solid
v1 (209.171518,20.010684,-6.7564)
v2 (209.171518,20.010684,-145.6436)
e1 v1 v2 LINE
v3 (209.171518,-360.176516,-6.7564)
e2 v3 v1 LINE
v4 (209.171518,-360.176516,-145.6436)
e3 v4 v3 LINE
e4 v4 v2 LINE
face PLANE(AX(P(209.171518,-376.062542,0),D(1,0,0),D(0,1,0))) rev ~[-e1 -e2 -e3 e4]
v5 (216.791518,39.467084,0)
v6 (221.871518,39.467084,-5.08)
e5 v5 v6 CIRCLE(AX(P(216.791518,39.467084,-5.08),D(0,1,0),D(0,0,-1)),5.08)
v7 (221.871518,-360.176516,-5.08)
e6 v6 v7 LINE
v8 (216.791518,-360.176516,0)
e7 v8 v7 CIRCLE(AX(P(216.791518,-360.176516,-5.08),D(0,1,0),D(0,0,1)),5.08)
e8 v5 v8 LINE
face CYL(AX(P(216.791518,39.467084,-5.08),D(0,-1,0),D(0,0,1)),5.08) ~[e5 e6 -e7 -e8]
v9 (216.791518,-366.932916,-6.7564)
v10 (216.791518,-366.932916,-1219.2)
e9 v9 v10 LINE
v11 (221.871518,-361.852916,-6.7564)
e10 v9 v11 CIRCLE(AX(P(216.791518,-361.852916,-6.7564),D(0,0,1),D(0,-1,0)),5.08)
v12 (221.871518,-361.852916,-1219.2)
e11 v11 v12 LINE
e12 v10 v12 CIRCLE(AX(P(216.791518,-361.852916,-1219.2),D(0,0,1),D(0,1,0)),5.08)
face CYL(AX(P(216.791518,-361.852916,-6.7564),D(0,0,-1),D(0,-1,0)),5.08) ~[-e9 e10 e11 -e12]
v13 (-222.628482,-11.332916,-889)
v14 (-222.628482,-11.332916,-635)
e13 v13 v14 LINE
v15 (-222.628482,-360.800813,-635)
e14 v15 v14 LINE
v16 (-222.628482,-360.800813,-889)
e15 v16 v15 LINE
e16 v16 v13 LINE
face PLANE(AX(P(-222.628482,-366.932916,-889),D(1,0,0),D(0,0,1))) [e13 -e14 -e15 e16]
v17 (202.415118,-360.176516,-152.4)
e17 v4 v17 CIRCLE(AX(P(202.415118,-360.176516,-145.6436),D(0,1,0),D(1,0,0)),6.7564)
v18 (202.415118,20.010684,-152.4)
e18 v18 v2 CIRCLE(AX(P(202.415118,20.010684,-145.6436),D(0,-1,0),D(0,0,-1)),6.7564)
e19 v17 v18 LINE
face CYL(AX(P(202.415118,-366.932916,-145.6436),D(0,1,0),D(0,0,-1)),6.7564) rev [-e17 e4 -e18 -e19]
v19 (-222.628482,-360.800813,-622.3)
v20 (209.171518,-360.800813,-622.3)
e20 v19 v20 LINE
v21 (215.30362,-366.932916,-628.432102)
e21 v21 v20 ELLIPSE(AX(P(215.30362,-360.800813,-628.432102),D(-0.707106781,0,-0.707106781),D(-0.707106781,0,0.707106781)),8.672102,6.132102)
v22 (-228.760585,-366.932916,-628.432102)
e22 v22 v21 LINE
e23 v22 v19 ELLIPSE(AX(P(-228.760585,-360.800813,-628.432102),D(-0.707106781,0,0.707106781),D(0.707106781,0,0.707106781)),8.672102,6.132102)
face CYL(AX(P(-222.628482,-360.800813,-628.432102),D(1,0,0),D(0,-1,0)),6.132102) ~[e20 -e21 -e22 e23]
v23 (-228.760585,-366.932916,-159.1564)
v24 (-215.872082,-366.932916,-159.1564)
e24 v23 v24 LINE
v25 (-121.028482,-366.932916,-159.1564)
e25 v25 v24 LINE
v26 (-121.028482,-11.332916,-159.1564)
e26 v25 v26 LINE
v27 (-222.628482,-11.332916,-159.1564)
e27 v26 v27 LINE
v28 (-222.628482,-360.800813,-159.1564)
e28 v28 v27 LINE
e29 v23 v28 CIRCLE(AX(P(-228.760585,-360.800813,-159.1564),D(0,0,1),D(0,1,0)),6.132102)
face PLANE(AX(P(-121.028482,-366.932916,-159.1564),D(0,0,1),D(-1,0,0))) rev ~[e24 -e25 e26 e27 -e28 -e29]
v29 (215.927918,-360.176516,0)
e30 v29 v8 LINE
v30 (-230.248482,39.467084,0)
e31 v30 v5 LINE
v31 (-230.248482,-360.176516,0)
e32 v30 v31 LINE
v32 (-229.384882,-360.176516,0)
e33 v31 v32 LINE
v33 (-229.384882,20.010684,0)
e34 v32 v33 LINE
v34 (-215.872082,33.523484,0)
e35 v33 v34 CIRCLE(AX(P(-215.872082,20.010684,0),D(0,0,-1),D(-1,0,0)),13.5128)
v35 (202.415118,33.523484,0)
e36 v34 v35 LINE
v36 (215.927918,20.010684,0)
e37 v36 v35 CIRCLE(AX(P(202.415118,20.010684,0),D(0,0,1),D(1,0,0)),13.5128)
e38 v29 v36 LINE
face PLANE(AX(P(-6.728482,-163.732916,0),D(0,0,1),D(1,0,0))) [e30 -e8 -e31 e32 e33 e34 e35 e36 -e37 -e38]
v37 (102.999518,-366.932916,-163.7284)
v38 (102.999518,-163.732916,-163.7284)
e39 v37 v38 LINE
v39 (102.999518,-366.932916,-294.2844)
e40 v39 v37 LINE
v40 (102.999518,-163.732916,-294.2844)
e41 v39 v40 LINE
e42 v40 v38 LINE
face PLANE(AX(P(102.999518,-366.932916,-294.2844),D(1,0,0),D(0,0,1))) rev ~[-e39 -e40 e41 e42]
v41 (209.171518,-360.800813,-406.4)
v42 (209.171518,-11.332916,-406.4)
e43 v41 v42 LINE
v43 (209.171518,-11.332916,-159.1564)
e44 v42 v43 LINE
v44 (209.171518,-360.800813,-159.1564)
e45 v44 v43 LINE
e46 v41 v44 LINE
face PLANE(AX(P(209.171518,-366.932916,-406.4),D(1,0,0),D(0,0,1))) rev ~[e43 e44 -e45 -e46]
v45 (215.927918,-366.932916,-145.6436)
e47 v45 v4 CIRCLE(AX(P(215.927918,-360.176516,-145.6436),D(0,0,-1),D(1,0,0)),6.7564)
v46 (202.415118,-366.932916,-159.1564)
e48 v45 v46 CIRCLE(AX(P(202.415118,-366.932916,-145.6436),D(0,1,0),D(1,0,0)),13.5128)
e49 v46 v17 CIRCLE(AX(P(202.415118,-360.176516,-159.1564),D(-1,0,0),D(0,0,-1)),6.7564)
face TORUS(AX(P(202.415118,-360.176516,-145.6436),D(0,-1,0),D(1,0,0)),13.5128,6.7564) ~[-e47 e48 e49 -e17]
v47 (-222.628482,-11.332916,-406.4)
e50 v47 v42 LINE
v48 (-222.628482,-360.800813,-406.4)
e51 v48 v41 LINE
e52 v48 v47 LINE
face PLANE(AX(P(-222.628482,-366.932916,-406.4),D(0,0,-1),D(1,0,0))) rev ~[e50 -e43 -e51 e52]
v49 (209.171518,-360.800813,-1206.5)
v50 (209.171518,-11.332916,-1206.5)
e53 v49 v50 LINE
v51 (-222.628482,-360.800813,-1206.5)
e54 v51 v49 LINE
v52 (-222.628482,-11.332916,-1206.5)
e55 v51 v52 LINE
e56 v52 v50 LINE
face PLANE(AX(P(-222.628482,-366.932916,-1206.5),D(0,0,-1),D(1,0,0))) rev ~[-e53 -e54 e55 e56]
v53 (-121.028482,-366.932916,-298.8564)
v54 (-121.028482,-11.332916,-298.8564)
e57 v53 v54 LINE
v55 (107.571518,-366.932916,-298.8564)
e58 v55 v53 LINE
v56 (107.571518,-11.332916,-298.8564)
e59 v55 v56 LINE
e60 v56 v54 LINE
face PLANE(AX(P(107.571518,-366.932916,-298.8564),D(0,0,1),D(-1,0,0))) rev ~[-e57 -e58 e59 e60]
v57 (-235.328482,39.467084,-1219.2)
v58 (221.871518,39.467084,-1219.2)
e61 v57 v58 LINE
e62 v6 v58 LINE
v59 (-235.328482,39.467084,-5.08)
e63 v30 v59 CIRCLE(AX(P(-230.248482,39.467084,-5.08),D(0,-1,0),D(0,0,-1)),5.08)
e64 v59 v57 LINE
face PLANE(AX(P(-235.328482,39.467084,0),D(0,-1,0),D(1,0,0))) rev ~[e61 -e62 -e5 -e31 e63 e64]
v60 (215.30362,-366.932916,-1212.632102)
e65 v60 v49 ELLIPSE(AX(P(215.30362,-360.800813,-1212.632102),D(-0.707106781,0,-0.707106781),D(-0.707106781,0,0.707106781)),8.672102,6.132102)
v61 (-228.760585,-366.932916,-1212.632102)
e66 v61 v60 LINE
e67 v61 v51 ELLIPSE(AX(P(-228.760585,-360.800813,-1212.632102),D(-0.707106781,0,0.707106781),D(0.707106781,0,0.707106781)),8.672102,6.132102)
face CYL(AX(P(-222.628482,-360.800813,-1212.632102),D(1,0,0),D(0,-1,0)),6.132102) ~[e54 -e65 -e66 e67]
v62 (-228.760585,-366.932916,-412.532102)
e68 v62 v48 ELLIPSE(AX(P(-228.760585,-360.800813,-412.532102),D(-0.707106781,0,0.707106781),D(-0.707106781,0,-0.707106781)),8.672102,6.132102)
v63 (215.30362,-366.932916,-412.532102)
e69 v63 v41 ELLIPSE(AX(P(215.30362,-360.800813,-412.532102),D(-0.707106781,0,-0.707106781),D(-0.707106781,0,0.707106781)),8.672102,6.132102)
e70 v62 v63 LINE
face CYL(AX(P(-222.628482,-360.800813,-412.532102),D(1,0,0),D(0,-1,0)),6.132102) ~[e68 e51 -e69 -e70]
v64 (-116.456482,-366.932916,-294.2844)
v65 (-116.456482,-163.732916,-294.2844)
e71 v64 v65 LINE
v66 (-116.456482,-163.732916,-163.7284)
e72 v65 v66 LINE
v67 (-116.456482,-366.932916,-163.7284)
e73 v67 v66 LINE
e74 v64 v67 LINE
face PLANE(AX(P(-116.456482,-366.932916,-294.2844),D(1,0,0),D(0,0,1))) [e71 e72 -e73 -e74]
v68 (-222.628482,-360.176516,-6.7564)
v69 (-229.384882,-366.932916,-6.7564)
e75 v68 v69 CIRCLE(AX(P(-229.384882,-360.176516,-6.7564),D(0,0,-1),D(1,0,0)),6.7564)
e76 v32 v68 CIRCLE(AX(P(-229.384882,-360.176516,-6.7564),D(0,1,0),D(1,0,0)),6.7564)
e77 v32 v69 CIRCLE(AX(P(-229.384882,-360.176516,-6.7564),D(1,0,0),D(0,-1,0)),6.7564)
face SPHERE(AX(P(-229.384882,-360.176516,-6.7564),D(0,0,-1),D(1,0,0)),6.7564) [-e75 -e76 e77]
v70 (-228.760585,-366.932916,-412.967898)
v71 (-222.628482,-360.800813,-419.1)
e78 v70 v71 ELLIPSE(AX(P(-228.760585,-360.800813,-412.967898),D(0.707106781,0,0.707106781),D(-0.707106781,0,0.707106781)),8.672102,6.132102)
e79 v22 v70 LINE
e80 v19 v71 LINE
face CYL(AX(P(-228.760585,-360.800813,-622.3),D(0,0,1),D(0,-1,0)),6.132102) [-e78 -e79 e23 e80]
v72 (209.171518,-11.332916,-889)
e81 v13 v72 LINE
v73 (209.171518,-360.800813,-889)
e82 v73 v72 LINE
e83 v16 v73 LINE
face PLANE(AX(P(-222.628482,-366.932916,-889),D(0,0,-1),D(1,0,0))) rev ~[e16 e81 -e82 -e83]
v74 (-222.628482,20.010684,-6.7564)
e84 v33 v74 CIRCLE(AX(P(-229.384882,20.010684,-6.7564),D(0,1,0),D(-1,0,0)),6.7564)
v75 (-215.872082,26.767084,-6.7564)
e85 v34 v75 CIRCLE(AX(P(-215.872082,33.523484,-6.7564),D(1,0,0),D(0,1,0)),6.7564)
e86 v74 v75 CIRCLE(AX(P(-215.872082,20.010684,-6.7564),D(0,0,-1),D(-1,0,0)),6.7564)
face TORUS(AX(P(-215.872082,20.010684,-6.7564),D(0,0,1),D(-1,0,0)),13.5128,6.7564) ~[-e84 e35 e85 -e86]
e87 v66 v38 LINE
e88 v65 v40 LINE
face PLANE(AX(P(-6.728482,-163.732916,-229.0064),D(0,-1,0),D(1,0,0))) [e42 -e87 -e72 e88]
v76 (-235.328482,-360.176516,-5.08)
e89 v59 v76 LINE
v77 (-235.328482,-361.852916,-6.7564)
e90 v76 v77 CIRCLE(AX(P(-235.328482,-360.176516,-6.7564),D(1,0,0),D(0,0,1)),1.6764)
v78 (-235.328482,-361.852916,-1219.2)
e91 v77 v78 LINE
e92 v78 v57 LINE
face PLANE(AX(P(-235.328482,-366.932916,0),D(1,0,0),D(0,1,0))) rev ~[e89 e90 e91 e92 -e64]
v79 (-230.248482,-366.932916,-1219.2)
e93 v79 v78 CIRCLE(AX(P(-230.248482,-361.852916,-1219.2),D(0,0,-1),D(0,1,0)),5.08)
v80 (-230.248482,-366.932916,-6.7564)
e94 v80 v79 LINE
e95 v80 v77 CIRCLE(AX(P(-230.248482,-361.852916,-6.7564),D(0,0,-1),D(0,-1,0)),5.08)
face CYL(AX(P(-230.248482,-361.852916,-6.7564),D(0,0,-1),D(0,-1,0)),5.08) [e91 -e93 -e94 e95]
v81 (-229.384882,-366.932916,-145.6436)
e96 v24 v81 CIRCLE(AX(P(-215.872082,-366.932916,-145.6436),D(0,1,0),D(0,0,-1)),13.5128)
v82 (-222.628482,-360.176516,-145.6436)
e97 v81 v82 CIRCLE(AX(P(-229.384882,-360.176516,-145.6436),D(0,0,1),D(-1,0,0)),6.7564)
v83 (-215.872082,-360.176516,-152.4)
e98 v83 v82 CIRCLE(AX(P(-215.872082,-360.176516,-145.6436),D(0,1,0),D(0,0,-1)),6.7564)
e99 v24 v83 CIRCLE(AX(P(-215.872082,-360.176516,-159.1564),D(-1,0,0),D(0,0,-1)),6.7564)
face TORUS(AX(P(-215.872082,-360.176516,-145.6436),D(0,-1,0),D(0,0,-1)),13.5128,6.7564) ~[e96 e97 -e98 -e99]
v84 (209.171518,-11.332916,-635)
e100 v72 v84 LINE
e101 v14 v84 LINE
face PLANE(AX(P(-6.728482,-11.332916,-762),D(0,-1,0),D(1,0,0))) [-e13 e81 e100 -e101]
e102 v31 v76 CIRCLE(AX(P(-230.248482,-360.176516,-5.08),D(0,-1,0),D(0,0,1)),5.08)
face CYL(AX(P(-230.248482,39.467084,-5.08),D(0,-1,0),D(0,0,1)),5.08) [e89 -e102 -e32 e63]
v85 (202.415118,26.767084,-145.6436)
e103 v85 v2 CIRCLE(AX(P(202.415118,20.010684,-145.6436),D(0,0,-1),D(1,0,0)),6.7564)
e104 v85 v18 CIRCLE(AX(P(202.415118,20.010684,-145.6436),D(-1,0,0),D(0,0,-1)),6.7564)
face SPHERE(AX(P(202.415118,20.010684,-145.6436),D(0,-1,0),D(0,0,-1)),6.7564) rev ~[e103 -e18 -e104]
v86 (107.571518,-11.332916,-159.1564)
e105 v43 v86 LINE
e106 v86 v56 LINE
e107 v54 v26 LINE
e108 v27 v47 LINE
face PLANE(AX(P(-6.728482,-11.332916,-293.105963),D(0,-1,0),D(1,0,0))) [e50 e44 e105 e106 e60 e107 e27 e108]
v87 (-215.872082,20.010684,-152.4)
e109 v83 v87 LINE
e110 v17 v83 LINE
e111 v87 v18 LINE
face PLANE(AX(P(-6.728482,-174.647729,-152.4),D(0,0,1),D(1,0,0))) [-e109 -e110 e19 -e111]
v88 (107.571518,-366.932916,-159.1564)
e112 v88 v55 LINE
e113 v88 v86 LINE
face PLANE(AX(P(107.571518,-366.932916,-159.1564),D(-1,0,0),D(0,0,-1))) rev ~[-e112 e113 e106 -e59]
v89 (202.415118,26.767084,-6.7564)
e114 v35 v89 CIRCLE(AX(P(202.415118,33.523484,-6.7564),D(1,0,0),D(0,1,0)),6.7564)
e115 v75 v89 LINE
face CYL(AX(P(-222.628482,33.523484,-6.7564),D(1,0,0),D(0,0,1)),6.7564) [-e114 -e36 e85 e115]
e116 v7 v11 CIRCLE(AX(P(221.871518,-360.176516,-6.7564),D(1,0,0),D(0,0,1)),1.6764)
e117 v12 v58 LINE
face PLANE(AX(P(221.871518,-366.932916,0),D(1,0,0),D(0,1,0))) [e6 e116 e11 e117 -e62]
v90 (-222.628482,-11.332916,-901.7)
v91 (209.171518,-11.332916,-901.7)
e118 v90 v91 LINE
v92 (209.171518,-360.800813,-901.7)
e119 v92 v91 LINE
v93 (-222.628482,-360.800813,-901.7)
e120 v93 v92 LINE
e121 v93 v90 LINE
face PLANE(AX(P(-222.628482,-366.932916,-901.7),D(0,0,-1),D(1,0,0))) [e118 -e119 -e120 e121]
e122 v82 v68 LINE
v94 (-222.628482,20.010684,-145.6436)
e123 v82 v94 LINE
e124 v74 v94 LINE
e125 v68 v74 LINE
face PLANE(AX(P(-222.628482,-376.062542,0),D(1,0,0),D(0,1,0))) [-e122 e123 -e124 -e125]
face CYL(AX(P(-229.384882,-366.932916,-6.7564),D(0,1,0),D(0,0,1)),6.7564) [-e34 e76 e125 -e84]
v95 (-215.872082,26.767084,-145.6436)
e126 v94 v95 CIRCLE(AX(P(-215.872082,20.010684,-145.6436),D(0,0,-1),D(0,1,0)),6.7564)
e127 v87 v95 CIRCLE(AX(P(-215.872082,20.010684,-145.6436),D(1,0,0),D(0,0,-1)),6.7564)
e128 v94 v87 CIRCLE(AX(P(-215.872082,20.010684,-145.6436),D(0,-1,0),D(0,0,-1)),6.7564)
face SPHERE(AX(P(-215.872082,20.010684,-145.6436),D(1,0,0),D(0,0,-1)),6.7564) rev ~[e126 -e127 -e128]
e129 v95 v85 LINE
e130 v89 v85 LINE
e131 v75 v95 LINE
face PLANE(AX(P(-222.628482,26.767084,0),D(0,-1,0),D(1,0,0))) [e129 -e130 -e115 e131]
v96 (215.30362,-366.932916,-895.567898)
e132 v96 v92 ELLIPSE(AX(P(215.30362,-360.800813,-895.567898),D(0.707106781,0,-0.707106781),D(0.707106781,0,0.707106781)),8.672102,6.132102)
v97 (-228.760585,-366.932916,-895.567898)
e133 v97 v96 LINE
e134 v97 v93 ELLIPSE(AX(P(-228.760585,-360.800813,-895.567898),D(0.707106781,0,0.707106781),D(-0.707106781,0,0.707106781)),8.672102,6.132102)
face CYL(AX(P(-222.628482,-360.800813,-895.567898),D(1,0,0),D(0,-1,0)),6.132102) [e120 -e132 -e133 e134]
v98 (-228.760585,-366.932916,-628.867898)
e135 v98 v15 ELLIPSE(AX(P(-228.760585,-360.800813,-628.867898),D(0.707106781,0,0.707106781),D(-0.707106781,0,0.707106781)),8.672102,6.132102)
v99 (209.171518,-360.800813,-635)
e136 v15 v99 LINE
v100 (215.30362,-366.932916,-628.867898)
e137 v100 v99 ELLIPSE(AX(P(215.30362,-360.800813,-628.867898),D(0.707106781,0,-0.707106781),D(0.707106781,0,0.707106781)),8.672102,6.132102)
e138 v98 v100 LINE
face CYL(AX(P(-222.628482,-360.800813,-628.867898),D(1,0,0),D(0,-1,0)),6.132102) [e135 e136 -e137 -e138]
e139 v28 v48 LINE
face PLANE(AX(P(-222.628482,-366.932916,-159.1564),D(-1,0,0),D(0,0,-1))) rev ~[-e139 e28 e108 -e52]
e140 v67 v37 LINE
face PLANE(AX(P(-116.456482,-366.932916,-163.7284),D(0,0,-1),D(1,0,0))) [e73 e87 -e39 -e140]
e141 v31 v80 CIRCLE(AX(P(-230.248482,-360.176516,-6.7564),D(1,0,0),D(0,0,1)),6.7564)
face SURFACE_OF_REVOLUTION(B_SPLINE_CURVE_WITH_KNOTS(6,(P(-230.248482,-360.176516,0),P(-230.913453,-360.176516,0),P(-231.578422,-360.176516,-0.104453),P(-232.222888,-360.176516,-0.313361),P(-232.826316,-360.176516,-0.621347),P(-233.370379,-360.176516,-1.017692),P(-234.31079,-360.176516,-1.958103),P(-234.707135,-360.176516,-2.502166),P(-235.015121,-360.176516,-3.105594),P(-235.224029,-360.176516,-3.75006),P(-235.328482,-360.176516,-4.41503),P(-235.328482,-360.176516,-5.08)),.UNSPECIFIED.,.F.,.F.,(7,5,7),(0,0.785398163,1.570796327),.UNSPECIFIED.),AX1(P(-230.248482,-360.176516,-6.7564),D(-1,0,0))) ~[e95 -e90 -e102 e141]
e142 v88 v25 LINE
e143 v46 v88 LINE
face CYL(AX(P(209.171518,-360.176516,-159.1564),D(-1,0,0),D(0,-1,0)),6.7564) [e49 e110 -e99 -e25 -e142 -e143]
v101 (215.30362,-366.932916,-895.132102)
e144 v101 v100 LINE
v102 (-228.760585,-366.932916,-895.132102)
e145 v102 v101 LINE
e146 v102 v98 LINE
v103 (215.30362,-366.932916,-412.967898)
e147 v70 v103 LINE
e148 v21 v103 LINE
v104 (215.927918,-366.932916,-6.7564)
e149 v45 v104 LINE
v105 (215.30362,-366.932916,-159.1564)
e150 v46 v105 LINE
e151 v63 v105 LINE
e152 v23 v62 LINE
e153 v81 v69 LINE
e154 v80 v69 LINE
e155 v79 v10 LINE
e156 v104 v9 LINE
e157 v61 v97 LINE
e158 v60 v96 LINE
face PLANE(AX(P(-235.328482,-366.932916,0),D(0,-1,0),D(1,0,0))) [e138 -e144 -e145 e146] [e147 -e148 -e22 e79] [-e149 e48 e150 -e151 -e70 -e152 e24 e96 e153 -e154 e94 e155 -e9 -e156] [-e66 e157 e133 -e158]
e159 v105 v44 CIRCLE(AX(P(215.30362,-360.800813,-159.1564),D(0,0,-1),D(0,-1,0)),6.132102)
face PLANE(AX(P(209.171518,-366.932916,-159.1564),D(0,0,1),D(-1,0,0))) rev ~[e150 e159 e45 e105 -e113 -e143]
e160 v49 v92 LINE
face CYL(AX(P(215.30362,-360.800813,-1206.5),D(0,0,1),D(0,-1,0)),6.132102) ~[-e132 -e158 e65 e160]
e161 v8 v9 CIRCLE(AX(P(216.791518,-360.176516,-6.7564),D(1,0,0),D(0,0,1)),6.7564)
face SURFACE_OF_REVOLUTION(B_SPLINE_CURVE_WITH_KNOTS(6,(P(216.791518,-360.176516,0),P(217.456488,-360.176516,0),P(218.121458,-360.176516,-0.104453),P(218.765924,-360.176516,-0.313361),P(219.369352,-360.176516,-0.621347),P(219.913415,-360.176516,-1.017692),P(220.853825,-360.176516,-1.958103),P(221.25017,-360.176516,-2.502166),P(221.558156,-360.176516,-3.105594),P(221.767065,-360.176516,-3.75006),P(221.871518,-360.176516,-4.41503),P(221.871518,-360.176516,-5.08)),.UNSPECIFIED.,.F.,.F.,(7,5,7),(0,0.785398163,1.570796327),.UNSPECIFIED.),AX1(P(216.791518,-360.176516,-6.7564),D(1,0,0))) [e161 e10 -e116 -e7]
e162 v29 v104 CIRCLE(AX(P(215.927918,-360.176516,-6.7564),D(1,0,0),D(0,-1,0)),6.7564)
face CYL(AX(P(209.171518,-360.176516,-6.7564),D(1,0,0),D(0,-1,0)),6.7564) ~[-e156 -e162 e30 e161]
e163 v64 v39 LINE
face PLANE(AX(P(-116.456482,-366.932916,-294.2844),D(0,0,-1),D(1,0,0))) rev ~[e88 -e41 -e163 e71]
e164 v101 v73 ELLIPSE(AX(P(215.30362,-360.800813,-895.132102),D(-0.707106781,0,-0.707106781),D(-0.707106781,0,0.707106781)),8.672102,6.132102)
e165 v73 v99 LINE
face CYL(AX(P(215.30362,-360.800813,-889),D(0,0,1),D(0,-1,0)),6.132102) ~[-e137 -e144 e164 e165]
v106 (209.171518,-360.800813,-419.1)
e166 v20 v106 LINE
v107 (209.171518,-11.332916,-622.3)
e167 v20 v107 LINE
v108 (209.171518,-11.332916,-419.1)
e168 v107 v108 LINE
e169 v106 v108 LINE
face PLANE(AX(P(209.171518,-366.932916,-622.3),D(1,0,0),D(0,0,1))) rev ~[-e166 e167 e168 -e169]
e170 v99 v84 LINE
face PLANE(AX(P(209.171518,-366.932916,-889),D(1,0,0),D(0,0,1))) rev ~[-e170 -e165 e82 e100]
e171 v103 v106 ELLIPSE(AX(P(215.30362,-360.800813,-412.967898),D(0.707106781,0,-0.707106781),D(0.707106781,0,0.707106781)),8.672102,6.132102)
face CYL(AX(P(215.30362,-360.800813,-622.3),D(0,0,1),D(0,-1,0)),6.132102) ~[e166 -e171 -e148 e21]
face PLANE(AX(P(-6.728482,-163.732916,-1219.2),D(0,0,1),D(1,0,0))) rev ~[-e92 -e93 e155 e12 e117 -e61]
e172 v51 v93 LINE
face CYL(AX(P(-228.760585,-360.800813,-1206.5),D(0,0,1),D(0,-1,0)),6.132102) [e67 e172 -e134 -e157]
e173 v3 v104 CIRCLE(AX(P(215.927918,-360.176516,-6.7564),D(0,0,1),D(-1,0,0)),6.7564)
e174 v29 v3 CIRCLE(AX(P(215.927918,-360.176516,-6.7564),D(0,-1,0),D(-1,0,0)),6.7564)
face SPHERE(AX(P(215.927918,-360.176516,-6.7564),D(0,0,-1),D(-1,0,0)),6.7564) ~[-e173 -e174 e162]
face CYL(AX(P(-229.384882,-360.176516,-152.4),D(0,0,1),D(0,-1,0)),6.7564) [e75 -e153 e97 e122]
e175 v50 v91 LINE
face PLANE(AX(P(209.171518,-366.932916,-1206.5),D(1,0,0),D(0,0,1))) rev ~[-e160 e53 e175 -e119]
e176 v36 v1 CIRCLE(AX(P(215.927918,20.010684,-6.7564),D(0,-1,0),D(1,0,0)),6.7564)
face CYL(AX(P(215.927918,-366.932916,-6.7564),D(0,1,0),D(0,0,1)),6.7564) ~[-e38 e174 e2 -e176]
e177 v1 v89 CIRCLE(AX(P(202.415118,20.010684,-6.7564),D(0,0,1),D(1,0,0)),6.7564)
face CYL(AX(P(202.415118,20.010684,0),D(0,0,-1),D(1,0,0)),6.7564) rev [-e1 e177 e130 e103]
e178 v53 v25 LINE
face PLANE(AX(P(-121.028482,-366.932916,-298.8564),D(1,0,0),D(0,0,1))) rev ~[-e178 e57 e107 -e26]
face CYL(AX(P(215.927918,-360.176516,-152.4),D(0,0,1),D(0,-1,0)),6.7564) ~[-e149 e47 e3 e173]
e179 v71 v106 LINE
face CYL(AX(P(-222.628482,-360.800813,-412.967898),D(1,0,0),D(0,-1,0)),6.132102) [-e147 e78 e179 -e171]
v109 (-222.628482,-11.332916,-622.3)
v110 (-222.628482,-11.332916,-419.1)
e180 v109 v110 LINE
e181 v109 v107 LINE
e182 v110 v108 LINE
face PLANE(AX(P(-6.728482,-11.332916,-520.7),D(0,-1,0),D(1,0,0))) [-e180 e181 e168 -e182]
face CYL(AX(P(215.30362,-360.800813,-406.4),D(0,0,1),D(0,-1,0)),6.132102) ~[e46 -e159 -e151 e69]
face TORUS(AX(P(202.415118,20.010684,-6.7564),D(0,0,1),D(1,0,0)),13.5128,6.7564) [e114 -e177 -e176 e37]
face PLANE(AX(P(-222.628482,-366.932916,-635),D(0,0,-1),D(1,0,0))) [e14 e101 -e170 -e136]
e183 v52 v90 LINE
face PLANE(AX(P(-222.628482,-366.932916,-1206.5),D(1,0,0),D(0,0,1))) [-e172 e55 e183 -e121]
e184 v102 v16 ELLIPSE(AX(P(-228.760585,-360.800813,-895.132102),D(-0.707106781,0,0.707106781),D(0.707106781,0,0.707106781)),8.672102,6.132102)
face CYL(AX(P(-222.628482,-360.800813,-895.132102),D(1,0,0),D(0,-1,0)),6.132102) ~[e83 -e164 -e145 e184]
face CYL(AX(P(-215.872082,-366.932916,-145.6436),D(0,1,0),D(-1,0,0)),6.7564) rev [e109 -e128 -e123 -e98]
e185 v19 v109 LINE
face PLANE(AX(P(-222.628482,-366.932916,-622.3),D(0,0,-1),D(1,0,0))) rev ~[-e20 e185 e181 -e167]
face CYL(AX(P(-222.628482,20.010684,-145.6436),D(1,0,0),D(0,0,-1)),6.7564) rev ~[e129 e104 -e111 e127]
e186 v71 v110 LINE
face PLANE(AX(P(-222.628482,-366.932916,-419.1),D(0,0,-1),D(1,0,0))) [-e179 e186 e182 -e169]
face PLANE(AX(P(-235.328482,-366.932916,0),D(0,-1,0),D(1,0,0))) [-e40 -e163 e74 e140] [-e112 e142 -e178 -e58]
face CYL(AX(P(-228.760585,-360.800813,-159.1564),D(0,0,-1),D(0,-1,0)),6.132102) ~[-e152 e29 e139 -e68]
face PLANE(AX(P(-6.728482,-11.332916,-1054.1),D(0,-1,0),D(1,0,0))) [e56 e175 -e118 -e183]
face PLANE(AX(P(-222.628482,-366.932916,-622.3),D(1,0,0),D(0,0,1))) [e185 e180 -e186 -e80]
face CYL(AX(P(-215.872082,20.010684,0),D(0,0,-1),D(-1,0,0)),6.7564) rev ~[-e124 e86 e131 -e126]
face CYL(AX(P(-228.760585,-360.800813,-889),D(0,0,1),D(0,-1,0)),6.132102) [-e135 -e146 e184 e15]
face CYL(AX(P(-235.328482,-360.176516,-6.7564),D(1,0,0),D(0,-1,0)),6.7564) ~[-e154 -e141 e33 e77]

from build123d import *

# Parameters (mm, degrees)
F0_W      = 457.2
F0_H      = 406.4
F1_DEPTH  = 1219.2
F2_W      = 431.8
F2_H      = 402.8296259509
F3_DEPTH  = 152.4
F4_R      = 6.7564
F5_W      = 431.8
F5_H      = 304.8
F6_DEPTH  = 355.6
F7_W      = 431.8
F7_H      = 254
F7_H_2    = 203.2
F8_DEPTH  = 355.6
F9_R      = 6.1321024484
F10_W     = 219.456
F10_H     = 130.556
F11_DEPTH = 203.2
F12_R     = 5.08


with BuildPart() as f1:
    # F0 (on Top) → F1 (new body)
    with BuildSketch(Plane.XY):
        with Locations((-6.7284821169, -163.7329156511)):
            Rectangle(F0_W, F0_H)
    extrude(amount=-F1_DEPTH)

    # F2 (on face) → F3 (cut)
    with BuildSketch(Plane.XY):
        with Locations((-6.7284821169, -174.6477286265)):
            Rectangle(F2_W, F2_H)
    extrude(amount=-F3_DEPTH, mode=Mode.SUBTRACT)

    # F4
    f4_edges = [f1.edges().sort_by_distance(p)[0] for p in [
        (209.171518, -170.082916, -152.4),
        (-6.728482, 26.767084, -152.4),
        (209.171518, 26.767084, -76.2),
        (209.171518, -366.932916, -76.2),
        (209.171518, -170.082916, 0),
        (215.521518, -366.932916, 0),
        (-222.628482, -170.082916, -152.4),
        (-222.628482, 26.767084, -76.2),
        (-6.728482, -366.932916, -152.4),
        (-222.628482, -366.932916, -76.2),
        (-222.628482, -170.082916, 0),
        (-228.978482, -366.932916, 0),
        (-6.728482, 26.767084, 0),
    ]]
    fillet(f4_edges, radius=F4_R)

    # F5 (on face) → F6 (cut)
    with BuildSketch(Plane.XZ.offset(366.9329156511)):
        with Locations((-6.7284821169, -1054.1)):
            Rectangle(F5_W, F5_H)
    extrude(amount=-F6_DEPTH, mode=Mode.SUBTRACT)

    # F7 (on face) → F8 (cut)
    with BuildSketch(Plane.XZ.offset(366.9329156511)):
        with Locations((-6.7284821169, -762)):
            Rectangle(F7_W, F7_H)
        with Locations((-6.7284821169, -520.7)):
            Rectangle(F7_W, F7_H_2)
        Polygon((-121.0284821169, -298.8564), (-121.0284821169, -159.1564), (-222.6284821169, -159.1564), (-222.6284821169, -406.4), (209.1715178831, -406.4), (209.1715178831, -159.1564), (107.5715178831, -159.1564), (107.5715178831, -298.8564), align=None)
    extrude(amount=-F8_DEPTH, mode=Mode.SUBTRACT)

    # F9
    f9_edges = [f1.edges().sort_by_distance(p)[0] for p in [
        (-222.628482, -366.932916, -520.7),
        (209.171518, -366.932916, -520.7),
        (-222.628482, -366.932916, -282.7782),
        (209.171518, -366.932916, -282.7782),
        (209.171518, -366.932916, -762),
        (-222.628482, -366.932916, -762),
        (-222.628482, -366.932916, -1054.1),
        (209.171518, -366.932916, -1054.1),
        (-6.728482, -366.932916, -1206.5),
        (-6.728482, -366.932916, -889),
        (-6.728482, -366.932916, -901.7),
        (-6.728482, -366.932916, -635),
        (-6.728482, -366.932916, -622.3),
        (-6.728482, -366.932916, -419.1),
        (-6.728482, -366.932916, -406.4),
    ]]
    fillet(f9_edges, radius=F9_R)

    # F10 (on face) → F11 (cut)
    with BuildSketch(Plane.XZ.offset(366.9329156511)):
        with Locations((-6.7284821169, -229.0064)):
            Rectangle(F10_W, F10_H)
    extrude(amount=-F11_DEPTH, mode=Mode.SUBTRACT)

    # F12
    f12_edges = [f1.edges().sort_by_distance(p)[0] for p in [
        (-235.328482, -366.932916, -612.9782),
        (221.871518, -366.932916, -612.9782),
        (221.871518, -160.354716, 0),
        (-235.328482, -160.354716, 0),
        (221.871518, -364.954012, -1.978904),
        (-235.328482, -364.954012, -1.978904),
    ]]
    fillet(f12_edges, radius=F12_R)


solid = f1.part
